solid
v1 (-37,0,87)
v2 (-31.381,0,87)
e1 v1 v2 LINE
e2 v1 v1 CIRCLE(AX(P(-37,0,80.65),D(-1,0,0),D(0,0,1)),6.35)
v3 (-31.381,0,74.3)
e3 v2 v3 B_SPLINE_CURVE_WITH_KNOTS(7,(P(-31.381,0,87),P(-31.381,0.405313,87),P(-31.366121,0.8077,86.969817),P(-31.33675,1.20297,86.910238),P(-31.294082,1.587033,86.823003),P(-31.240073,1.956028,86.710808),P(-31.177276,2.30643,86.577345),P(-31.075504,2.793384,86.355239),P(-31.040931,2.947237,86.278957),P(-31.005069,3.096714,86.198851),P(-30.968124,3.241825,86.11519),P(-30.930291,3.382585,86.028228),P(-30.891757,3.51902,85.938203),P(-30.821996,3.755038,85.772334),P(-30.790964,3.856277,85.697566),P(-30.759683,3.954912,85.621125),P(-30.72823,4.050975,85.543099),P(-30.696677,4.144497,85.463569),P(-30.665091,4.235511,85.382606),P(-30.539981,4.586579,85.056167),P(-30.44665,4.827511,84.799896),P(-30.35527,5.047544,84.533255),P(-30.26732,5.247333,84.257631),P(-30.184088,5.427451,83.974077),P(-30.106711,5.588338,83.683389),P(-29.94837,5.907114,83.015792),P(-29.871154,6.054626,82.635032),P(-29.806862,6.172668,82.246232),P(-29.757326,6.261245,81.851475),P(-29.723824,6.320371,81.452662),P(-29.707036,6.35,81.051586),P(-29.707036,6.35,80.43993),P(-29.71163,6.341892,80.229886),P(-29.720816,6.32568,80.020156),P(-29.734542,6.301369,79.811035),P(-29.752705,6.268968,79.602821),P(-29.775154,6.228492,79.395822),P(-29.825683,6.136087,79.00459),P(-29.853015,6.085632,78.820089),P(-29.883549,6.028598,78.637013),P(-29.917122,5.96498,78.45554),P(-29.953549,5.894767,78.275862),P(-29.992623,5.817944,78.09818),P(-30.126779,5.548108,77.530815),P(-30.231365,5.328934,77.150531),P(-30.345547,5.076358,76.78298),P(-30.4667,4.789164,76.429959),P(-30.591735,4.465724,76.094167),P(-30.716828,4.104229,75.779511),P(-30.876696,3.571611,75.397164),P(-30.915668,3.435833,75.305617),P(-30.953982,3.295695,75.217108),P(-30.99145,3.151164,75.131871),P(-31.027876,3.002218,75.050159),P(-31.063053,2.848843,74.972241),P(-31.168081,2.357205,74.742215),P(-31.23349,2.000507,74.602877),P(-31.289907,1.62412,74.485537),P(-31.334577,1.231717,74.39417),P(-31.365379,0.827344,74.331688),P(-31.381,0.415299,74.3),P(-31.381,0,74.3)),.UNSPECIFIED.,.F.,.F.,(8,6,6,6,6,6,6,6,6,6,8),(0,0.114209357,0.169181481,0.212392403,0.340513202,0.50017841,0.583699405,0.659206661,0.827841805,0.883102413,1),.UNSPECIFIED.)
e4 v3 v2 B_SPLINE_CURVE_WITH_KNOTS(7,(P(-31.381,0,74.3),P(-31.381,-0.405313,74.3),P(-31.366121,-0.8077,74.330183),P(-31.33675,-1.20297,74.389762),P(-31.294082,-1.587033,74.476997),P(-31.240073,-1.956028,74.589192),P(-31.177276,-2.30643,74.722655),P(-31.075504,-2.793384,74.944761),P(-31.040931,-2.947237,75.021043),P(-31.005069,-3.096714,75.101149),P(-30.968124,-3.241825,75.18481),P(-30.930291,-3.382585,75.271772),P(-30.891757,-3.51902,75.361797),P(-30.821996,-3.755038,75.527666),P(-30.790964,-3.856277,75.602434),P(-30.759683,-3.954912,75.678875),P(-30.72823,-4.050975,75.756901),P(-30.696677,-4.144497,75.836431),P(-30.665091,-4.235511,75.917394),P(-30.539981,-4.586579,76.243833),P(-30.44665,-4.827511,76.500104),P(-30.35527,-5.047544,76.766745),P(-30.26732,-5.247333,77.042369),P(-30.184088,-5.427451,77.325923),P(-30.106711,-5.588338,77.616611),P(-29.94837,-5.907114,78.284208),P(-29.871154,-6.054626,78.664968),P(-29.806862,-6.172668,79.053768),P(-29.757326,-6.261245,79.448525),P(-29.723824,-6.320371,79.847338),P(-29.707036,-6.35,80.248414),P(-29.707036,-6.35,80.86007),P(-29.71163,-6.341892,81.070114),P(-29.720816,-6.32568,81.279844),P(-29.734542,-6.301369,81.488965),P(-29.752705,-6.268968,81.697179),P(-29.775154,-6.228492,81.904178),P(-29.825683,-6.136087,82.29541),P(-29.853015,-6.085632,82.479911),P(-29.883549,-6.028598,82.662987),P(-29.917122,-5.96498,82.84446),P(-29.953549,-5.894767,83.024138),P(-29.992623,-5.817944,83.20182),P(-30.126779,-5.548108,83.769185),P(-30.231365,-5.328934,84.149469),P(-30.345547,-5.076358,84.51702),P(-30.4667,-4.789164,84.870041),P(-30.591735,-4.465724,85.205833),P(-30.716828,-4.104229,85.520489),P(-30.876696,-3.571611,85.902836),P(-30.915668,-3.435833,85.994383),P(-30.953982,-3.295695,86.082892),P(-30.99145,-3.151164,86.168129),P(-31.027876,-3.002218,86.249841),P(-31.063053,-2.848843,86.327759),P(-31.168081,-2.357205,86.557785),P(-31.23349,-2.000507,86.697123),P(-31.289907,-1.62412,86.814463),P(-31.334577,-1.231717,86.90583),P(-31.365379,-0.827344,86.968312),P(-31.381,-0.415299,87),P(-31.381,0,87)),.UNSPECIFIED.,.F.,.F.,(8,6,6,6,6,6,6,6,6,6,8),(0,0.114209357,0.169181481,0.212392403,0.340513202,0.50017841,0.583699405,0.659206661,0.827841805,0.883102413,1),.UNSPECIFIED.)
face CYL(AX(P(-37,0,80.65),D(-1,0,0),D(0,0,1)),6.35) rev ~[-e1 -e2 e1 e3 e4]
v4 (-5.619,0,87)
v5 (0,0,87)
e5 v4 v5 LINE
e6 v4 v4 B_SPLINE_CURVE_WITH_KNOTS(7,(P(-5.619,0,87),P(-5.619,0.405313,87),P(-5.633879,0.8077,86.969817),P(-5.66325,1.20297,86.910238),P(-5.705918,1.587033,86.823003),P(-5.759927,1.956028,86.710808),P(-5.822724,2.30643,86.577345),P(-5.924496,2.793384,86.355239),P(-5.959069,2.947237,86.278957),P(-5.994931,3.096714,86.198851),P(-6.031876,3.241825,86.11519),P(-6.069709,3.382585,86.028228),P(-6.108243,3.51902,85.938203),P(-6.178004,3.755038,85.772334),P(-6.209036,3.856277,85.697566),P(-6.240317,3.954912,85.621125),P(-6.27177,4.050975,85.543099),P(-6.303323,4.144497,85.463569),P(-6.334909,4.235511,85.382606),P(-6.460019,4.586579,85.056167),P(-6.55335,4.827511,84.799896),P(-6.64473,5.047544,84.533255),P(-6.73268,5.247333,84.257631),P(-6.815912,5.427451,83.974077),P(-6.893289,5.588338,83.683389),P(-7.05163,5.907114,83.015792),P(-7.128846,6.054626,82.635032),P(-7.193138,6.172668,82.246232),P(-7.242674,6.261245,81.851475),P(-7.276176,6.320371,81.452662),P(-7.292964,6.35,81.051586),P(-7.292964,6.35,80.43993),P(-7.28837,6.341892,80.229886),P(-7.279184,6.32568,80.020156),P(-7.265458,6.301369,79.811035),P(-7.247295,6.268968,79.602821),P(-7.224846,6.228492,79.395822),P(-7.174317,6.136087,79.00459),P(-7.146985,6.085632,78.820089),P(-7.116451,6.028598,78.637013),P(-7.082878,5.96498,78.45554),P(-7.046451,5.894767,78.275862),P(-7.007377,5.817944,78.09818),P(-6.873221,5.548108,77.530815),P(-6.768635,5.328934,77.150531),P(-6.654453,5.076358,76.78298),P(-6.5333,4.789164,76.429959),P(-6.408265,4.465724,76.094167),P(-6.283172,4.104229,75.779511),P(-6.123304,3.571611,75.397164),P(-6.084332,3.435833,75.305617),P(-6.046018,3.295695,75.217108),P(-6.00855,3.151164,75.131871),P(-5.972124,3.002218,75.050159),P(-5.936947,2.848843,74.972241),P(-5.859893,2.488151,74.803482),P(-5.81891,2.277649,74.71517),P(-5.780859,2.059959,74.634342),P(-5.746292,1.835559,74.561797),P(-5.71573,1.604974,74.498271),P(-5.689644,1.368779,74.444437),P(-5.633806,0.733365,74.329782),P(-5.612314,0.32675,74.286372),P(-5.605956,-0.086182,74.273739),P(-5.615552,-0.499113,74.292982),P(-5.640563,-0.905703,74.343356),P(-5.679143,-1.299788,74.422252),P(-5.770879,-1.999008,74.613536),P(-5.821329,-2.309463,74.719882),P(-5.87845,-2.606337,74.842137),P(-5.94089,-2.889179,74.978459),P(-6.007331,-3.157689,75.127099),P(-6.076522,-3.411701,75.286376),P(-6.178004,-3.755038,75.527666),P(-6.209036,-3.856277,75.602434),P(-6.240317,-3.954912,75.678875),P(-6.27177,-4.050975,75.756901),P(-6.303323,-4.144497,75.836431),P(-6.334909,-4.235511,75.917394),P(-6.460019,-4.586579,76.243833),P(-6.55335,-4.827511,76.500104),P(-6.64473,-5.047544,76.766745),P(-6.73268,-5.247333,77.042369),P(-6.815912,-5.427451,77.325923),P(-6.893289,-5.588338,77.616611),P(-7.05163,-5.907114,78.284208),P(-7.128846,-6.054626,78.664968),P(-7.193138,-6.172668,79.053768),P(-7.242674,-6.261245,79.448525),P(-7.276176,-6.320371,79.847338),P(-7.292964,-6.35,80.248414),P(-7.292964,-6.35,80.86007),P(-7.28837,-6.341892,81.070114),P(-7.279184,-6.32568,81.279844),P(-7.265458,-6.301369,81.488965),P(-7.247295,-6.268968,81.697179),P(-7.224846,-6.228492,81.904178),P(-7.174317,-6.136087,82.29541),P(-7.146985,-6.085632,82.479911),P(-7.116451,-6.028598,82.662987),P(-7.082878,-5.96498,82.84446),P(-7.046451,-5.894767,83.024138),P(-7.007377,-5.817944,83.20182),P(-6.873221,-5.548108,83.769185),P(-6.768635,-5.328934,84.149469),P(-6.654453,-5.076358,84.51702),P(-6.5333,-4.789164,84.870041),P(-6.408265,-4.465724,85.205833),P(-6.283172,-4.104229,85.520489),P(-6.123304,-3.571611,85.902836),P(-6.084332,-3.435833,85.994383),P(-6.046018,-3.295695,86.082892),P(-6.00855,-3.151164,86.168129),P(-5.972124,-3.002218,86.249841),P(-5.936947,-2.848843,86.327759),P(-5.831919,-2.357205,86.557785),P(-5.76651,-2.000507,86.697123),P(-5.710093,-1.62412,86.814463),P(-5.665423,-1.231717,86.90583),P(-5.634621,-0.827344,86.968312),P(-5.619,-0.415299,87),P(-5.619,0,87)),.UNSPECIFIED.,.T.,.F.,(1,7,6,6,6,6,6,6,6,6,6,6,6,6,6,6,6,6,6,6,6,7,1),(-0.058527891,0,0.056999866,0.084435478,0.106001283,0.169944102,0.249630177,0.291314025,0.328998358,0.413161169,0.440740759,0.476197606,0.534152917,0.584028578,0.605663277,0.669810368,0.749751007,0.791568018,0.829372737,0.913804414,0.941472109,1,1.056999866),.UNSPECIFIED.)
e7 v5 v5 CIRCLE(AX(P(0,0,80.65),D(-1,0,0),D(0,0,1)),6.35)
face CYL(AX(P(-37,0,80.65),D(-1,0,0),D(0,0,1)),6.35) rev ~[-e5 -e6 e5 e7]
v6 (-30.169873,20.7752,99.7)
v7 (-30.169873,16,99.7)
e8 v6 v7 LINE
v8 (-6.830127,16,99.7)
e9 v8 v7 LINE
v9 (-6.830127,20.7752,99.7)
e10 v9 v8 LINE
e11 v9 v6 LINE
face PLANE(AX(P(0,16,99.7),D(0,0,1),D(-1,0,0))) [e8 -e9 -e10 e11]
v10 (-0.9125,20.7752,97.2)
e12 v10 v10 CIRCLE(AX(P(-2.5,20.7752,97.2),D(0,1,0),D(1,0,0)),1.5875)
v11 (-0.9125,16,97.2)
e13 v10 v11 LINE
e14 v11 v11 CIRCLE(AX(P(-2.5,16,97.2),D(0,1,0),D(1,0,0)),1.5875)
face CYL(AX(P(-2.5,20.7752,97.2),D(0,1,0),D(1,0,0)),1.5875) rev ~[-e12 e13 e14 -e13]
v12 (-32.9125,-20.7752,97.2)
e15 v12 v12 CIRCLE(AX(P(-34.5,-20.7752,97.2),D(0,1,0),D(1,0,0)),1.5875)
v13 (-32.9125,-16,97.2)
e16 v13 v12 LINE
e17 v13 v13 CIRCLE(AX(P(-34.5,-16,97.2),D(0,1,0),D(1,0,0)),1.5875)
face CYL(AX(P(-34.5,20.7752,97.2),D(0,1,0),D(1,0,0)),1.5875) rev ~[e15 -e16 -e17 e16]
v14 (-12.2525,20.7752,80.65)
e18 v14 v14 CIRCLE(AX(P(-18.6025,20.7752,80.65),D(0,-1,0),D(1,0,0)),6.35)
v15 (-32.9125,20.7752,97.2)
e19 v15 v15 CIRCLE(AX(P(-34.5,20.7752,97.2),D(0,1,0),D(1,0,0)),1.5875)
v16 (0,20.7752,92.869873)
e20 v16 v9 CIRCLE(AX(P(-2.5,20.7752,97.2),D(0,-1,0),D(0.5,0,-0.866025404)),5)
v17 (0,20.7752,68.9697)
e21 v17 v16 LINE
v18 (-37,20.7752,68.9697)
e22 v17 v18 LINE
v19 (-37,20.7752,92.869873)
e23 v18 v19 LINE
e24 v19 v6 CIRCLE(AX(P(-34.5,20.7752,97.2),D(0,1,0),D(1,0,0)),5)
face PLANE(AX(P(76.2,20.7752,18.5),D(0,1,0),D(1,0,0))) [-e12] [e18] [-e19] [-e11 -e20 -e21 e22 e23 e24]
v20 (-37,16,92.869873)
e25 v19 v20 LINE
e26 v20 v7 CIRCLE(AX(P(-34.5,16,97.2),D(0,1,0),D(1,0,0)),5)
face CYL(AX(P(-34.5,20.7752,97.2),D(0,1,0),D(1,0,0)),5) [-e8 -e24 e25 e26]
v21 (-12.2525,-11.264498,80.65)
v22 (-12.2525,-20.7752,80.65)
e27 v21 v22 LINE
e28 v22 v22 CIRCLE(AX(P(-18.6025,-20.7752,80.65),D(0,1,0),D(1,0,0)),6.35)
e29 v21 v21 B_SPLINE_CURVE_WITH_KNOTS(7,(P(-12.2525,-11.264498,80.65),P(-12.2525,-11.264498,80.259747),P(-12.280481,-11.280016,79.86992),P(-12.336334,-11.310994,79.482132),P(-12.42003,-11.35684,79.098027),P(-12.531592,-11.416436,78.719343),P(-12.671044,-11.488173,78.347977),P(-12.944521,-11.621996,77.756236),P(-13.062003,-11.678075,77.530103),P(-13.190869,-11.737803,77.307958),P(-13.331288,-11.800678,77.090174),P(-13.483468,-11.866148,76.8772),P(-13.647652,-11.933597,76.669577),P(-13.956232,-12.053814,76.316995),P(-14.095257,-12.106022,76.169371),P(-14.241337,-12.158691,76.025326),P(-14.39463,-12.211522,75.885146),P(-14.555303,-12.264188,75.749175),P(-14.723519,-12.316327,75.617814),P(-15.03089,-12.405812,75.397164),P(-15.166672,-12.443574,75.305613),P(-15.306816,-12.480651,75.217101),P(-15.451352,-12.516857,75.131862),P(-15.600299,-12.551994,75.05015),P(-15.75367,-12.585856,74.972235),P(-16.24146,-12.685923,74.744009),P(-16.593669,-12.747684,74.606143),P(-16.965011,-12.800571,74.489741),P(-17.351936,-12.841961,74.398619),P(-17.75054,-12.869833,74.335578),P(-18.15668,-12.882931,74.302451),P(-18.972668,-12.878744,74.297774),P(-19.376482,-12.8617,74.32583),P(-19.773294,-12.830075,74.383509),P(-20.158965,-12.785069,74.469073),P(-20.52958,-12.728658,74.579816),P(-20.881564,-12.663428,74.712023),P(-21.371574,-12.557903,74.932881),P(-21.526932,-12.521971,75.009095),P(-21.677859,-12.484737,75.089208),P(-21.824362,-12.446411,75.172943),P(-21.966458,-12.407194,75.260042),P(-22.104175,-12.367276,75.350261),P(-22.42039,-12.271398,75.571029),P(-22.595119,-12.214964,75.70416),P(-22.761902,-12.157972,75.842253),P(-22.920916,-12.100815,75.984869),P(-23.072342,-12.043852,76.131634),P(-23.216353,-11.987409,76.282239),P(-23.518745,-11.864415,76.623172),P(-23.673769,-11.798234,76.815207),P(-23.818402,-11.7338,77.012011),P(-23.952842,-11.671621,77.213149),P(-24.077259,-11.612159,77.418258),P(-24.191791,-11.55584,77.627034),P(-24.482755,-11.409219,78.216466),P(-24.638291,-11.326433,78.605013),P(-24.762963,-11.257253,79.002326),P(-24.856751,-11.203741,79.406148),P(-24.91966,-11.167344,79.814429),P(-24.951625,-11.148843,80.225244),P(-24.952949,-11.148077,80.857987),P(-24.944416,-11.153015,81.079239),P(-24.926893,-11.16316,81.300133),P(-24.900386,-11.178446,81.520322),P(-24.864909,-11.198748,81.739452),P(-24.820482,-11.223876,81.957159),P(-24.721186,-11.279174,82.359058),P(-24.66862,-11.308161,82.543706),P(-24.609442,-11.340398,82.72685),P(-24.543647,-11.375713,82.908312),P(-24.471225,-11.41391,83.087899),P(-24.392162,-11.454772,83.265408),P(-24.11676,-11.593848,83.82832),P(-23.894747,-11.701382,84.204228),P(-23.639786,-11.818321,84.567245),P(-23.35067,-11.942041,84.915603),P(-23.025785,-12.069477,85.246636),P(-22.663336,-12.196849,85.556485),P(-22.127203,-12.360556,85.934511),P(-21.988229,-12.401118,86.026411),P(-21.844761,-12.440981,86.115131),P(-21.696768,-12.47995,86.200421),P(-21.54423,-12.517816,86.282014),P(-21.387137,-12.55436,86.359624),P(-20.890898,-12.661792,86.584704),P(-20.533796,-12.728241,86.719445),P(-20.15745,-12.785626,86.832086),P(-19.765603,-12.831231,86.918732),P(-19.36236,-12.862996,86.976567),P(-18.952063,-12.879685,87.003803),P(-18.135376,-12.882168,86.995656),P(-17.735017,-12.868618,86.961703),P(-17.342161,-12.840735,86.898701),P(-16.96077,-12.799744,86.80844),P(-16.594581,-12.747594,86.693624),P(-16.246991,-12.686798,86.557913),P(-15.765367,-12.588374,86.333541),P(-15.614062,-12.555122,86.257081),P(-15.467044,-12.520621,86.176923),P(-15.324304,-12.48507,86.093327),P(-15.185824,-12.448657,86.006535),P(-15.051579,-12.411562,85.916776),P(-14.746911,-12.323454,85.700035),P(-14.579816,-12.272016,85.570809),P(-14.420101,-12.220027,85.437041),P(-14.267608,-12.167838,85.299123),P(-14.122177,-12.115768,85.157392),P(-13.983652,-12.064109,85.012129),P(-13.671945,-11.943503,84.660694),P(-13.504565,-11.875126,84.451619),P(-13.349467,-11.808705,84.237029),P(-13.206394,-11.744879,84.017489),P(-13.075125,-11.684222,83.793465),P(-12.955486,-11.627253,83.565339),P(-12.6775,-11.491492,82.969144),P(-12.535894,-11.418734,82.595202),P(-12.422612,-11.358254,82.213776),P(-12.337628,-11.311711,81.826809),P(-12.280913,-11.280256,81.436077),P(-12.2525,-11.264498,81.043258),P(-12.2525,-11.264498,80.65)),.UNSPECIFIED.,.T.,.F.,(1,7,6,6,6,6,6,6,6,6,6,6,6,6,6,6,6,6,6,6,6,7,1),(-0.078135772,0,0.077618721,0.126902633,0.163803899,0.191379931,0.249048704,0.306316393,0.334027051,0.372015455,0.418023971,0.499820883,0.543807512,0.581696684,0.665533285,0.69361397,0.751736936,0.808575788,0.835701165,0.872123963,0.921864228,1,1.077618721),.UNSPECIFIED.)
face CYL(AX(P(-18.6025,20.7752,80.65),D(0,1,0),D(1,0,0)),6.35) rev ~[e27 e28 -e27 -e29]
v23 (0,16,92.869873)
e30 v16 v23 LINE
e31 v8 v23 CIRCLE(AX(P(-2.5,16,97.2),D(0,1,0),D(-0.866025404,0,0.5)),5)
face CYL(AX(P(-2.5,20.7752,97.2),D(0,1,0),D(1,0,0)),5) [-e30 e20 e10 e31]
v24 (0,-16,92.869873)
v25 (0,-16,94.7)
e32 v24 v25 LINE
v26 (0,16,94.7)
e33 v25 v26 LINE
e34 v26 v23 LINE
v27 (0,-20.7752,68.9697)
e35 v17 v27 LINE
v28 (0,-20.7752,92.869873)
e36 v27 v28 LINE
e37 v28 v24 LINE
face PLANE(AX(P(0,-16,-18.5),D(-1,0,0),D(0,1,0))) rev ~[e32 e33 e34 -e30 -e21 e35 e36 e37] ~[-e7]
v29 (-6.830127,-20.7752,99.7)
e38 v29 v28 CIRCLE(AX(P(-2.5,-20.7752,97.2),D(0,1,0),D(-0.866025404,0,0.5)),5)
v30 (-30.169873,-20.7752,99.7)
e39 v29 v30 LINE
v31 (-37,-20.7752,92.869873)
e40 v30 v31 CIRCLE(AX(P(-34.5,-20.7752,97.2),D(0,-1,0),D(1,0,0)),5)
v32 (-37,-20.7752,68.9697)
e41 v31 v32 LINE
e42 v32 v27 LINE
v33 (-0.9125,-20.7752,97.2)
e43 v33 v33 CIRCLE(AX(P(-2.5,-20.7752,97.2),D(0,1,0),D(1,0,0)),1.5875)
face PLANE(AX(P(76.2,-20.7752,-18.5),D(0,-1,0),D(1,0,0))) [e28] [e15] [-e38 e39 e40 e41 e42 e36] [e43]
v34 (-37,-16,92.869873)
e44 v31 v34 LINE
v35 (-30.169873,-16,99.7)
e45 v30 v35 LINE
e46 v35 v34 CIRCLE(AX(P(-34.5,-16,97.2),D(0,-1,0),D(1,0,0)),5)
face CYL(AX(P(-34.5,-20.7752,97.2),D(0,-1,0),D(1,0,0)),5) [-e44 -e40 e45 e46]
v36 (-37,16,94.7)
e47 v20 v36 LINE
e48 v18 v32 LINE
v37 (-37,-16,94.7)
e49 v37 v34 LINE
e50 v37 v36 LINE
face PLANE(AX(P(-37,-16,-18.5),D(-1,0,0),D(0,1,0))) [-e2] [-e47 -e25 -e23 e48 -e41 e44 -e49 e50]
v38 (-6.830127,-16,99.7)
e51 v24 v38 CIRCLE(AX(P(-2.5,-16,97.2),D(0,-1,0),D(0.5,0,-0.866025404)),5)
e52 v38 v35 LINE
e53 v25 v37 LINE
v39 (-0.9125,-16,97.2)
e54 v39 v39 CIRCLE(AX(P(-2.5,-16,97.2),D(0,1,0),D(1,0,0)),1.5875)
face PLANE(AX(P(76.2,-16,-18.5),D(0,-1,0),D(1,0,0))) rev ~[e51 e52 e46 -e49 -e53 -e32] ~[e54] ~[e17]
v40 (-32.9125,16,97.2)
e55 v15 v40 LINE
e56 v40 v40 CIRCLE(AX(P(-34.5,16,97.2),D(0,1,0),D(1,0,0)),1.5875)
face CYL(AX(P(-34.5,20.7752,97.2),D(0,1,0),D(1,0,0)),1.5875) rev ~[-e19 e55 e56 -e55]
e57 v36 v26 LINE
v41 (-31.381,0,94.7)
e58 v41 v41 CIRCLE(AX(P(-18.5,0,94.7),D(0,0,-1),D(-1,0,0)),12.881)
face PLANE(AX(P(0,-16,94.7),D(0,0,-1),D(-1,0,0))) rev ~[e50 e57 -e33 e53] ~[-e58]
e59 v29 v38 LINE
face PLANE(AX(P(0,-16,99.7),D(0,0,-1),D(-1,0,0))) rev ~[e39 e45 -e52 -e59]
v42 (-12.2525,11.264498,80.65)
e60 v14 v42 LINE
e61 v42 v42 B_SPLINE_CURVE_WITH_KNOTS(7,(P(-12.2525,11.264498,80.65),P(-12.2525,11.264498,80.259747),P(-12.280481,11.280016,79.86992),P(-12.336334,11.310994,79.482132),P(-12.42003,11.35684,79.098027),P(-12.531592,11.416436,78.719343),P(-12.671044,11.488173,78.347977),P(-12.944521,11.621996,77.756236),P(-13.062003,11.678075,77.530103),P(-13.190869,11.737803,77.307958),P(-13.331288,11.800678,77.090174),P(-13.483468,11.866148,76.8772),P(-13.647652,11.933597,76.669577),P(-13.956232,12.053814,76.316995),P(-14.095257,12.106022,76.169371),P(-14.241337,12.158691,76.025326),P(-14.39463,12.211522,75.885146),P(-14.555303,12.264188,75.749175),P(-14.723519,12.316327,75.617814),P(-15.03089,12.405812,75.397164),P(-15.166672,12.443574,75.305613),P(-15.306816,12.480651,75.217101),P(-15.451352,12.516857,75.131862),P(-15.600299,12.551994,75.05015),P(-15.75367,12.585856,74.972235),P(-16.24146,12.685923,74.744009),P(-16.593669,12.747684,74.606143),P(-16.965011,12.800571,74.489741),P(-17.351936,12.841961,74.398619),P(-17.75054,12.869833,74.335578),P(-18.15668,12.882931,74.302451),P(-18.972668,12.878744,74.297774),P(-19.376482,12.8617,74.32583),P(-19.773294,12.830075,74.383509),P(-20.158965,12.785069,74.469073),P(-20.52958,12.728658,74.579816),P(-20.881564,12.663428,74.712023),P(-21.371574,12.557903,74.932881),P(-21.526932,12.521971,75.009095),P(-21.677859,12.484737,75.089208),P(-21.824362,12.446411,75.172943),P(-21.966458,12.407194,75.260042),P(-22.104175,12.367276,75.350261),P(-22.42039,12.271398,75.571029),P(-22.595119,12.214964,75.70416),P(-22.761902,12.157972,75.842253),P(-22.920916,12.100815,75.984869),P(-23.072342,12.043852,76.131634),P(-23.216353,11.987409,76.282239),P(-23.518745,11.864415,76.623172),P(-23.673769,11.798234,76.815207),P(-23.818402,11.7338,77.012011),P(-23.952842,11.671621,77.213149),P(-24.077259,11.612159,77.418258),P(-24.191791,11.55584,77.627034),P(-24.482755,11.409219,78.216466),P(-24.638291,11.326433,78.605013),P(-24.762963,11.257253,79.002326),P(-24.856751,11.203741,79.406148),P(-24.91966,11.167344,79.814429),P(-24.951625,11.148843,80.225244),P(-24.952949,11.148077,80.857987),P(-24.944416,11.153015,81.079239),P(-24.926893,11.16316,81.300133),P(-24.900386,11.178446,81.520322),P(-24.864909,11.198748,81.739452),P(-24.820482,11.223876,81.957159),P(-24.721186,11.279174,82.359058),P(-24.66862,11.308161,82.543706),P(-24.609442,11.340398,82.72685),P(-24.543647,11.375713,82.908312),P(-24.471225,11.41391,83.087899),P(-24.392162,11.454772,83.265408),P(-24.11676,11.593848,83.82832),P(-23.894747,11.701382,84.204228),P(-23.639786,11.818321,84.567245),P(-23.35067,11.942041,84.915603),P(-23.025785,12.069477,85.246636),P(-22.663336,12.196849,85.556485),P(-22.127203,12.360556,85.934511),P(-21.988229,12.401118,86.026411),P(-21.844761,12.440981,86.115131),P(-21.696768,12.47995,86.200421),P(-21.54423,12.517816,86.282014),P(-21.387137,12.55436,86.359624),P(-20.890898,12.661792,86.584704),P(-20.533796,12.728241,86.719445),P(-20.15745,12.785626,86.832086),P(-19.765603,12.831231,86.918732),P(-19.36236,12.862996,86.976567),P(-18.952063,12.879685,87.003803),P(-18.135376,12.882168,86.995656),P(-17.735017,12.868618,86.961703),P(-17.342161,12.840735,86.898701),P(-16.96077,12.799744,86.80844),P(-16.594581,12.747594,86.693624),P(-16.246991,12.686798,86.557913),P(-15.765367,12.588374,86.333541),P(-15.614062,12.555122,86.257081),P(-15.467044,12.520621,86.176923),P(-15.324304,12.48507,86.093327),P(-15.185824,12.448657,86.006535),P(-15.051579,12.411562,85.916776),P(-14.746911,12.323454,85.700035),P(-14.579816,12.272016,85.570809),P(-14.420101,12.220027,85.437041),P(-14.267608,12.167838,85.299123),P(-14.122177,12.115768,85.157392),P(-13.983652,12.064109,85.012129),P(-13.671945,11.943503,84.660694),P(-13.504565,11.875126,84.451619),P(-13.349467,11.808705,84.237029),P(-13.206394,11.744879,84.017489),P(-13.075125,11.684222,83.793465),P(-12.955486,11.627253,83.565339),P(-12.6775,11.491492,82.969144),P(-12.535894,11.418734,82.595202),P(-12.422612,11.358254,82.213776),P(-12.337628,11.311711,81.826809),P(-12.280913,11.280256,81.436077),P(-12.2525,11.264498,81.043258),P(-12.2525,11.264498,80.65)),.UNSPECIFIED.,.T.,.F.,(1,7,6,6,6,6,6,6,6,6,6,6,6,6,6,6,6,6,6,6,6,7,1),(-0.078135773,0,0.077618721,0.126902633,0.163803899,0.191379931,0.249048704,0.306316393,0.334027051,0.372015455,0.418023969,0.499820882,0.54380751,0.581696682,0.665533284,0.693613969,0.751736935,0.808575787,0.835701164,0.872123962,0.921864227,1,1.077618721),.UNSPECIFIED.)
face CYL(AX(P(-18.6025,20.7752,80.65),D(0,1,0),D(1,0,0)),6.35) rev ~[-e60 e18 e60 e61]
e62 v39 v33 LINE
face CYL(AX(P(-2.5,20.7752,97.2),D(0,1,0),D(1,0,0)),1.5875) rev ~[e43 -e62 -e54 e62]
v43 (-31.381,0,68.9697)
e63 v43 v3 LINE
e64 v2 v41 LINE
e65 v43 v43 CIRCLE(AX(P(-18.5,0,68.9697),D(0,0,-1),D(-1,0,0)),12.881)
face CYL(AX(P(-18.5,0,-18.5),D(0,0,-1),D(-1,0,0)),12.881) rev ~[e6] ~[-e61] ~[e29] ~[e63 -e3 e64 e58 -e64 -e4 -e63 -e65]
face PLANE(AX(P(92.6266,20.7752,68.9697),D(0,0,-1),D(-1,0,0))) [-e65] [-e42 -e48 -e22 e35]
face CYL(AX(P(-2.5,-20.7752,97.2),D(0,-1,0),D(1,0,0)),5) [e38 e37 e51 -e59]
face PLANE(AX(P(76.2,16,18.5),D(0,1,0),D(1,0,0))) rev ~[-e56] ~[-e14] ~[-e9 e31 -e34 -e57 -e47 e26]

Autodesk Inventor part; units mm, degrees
ref_plane "YZ Plane" through (0, 0, 0) normal (1, 0, 0) x (0, 1, 0)
ref_plane "XZ Plane" through (0, 0, 0) normal (0, 1, 0) x (-1, 0, 0)
ref_plane "XY Plane" through (0, 0, 0) normal (0, 0, 1) x (1, 0, 0)
sketch "Sketch2" plane through (0, 0, 0) normal (1, 0, 0) x (0, 1, 0)
  circle A0 centre (0, 0) radius 12.881
  line L0 (-16, -18.5) -> (16, -18.5)
  line L1 (16, -18.5) -> (16, 18.5)
  line L2 (16, 18.5) -> (-16, 18.5)
  line L3 (-16, 18.5) -> (-16, -18.5)
  line L4 (-16, -18.5) -> (16, 18.5) construction
  line L5 (16, -18.5) -> (-16, 18.5) construction
  dimension "d9" = 25.762
  dimension "d10" = 32
  dimension "d11" = 37
extrude "Extrusion2" add sketch "Sketch2" along normal blind 76.2
sketch "Sketch3" plane through (0, -16, -18.5) normal (0, 0, -1) x (-1, 0, 0)
  line L0 (0, 0) -> (0, 32) projected
  circle A0 centre (18.5, 16) radius 12.881
  line L1 (0, 32) -> (0, 0)
  line L2 (0, 0) -> (37, 0)
  line L3 (37, 0) -> (37, 32)
  line L4 (37, 32) -> (0, 32)
  line L5 (0, 32) -> (37, 0) construction
  line L6 (0, 0) -> (37, 32) construction
  point P0 (0, 16)
  dimension "d14" = 25.762
  dimension "d15" = 32
  dimension "d16" = 37
extrude "Extrusion3" add sketch "Sketch3" against normal blind 113.2
sketch "Sketch4" plane through (76.2, -16, -18.5) normal (0, 0, -1) x (-1, 0, 0)
  circle A0 centre (94.7, 16) radius 12.881 projected
  point P0 (76.2, 16)
extrude "Extrusion4" add sketch "Sketch4" against normal blind 37
sketch "Sketch5" plane through (76.2, 16, 18.5) normal (0, 1, 0) x (1, 0, 0)
  line L0 (-113.2, 37) -> (0, 37) projected
  line L1 (-113.2, 37) -> (-113.2, -76.2) projected
  line L2 (-113.2, 37) -> (-100.1185, 50.0815)
  line L3 (-113.2, 37) -> (-94.7, 37) construction
  line L4 (-113.2, 37) -> (-126.2815, 23.9185)
  line L5 (-113.2, 37) -> (-94.7, 37) construction
  line L6 (-100.1185, 50.0815) -> (-154.0001, 103.963)
  line L7 (-126.2815, 23.9185) -> (-180.163, 77.8001)
  line L8 (-126.2815, 23.9185) -> (-50.0815, 23.9185) construction
  line L9 (-154.0001, 103.963) -> (-180.163, 77.8001)
  line L10 (-100.1185, 50.0815) -> (-87.037, 37)
  line L11 (-126.2815, 23.9185) -> (-113.2, 10.837)
  point P0 (-76.2, 18.5)
  dimension "d21" = 18.5
  dimension "d22" = 45
  dimension "d23" = 18.5
  dimension "d24" = 135
  dimension "d25" = 76.2
  dimension "d26" = 76.2
  dimension "d27" = 135
extrude "Extrusion5" add sketch "Sketch5" against normal blind 32
sketch "Sketch7" plane through (-77.8001, -16, -85.463) normal (-0.7071068, 0, -0.7071068) x (-0.7071068, 0, 0.7071068)
  line L0 (36.4256, 0.4968) -> (36.4256, 31.5032)
  line L1 (36.4256, 31.5032) -> (0.5744, 31.5032)
  line L2 (0.5744, 31.5032) -> (0.5744, 0.4968)
  line L3 (0.5744, 0.4968) -> (36.4256, 0.4968)
  circle A0 centre (18.5, 16) radius 12.881
  point P0 (5.4185, 16)
  point P1 (36.4256, 16)
  dimension "d131" = 25.762
extrude "Extrusion6" cut sketch "Sketch7" against normal blind 101.6 contours A0
sketch "Sketch8" plane through (76.2, 16, 18.5) normal (0, 1, 0) x (1, 0, 0)
  line L0 (-76.2, 0) -> (0, 0) projected
  line L1 (-87.037, 37) -> (0, 37) projected
  line L2 (-87.037, 37) -> (-154.0001, 103.963) projected
  line L3 (-180.163, 77.8001) -> (-113.2, 10.837) projected
  line L4 (-113.2, 10.837) -> (-113.2, -76.2) projected
  line L5 (-76.2, 0) -> (-76.2, -76.2) projected
  line L6 (0, 37) -> (5, 37)
  line L7 (5, 37) -> (5, 0)
  line L8 (5, 0) -> (0, 0)
  line L9 (0, 0) -> (0, 37)
  line L10 (-113.2, -76.2) -> (-76.2, -76.2)
  line L11 (-76.2, -76.2) -> (-76.2, -81.2)
  line L12 (-76.2, -81.2) -> (-113.2, -81.2)
  line L13 (-113.2, -81.2) -> (-113.2, -76.2)
  line L14 (-180.163, 77.8001) -> (-183.6985, 81.3356)
  line L15 (-183.6985, 81.3356) -> (-157.5356, 107.4985)
  line L16 (-157.5356, 107.4985) -> (-154.0001, 103.963)
  point P0 (-76.2, 18.5)
  dimension "d32" = 5
  dimension "d33" = 5
  dimension "d34" = 5
  dimension "d35" = 90
extrude "Extrusion7" add sketch "Sketch8" along normal blind 4.7752
sketch "Sketch9" plane through (76.2, -16, -18.5) normal (0, -1, 0) x (1, 0, 0)
  line L0 (-87.037, 0) -> (0, 0) projected
  line L1 (-76.2, 37) -> (0, 37) projected
  line L2 (-76.2, 37) -> (-76.2, 113.2) projected
  line L3 (-113.2, 26.163) -> (-113.2, 113.2) projected
  line L4 (-113.2, 26.163) -> (-180.163, -40.8001) projected
  line L5 (-154.0001, -66.963) -> (-87.037, 0) projected
  line L6 (-76.2, 118.2) -> (-76.2, 37) projected
  line L7 (-113.2, 113.2) -> (-76.2, 113.2)
  line L8 (-76.2, 113.2) -> (-76.2, 118.2)
  line L9 (-76.2, 118.2) -> (-113.2, 118.2)
  line L10 (-113.2, 118.2) -> (-113.2, 113.2)
  line L11 (-76.2, 37) -> (5, 37) projected
  line L12 (0, 0) -> (5, 0)
  line L13 (5, 0) -> (5, 37)
  line L14 (5, 37) -> (0, 37)
  line L15 (0, 37) -> (0, 0)
  line L16 (-183.6985, -44.3356) -> (-113.2, 26.163) projected
  line L17 (-180.163, -40.8001) -> (-183.6985, -44.3356)
  line L18 (-183.6985, -44.3356) -> (-157.5356, -70.4985)
  line L19 (-157.5356, -70.4985) -> (-154.0001, -66.963)
  point P0 (-76.2, 18.5)
extrude "Extrusion8" add sketch "Sketch9" along normal blind 4.7752
sketch "Sketch10" plane through (76.2, 20.7752, 18.5) normal (0, 1, 0) x (1, 0, 0)
  circle A0 centre (2.5, 34.5) radius 1.5875
  circle A1 centre (2.5, 2.5) radius 1.5875
  line L0 (0, 37) -> (0, 0)
  line L1 (0, 0) -> (5, 0)
  line L2 (5, 37) -> (5, 0)
  line L3 (0, 37) -> (5, 37)
  point P0 (-76.2, 18.5)
  point P1 (0, 18.5)
extrude "Extrusion9" cut sketch "Sketch10" against normal blind 279.4 contours A0 | A1
sketch "Sketch11" plane through (76.2, 20.7752, 18.5) normal (0, 1, 0) x (1, 0, 0)
  circle A0 centre (-78.7, -78.7) radius 1.5875
  circle A1 centre (-110.7, -78.7) radius 1.5875
  line L0 (-76.2, -76.2) -> (-113.2, -76.2)
  line L1 (-113.2, -76.2) -> (-113.2, -81.2)
  line L2 (-76.2, -81.2) -> (-113.2, -81.2)
  line L3 (-76.2, -76.2) -> (-76.2, -81.2)
  circle A2 centre (-157.5356, 103.963) radius 1.5875
  circle A3 centre (-180.163, 81.3356) radius 1.5875
  line L4 (-157.5356, 107.4985) -> (-183.6985, 81.3356)
  line L5 (-183.6985, 81.3356) -> (-180.163, 77.8001)
  line L6 (-154.0001, 103.963) -> (-180.163, 77.8001)
  line L7 (-157.5356, 107.4985) -> (-154.0001, 103.963)
  point P0 (-76.2, 18.5)
  point P1 (-94.7, -76.2)
  point P2 (-170.6171, 94.4171)
extrude "Extrusion10" cut sketch "Sketch11" against normal blind 279.4 contours A0 | A1 | A2 | A3
fillet "Fillet1" radius 3.175 3 edges at (-10.837, 0, -18.5) (0, 0, 18.5) (-37, 0, 7.663)
sketch "Sketch13" plane through (76.2, 20.7752, 18.5) normal (0, 1, 0) x (1, 0, 0)
  line L0 (-157.5356, 107.4985) -> (-183.6985, 81.3356) projected
  line L1 (-113.2, -81.2) -> (-76.2, -81.2) projected
  line L2 (5, 0) -> (5, 37) projected
  line L3 (5, 37) -> (5, 0) projected
  line L4 (5, 18.5) -> (-120.863, 18.5)
  line L5 (-114.1299, 11.767) -> (-183.6985, 81.3356) projected
  line L6 (-76.2, -81.2) -> (-113.2, -81.2) projected
  line L7 (-94.7, -81.2) -> (-95.2395, 19.0395)
  line L8 (-104.3477, 9.9312) -> (-86.1312, 28.1477) projected
  line L9 (-95.2395, 19.0395) -> (-170.6171, 94.4171)
  line L10 (-183.6985, 81.3356) -> (-157.5356, 107.4985) projected
  circle A0 centre (-14.05, 18.5) radius 6.35
  circle A1 centre (-39.45, 18.5) radius 6.35
  circle A2 centre (-64.85, 18.5) radius 6.35
  circle A3 centre (-90.25, 18.5) radius 6.35
  circle A4 centre (-94.8025, -62.15) radius 6.35
  circle A5 centre (-94.9392, -36.7504) radius 6.35
  circle A6 centre (-95.0759, -11.3507) radius 6.35
  circle A7 centre (-95.2126, 14.0489) radius 6.35
  circle A8 centre (-157.1467, 80.9467) radius 6.35
  circle A9 centre (-139.1862, 62.9862) radius 6.35
  circle A10 centre (-121.2257, 45.0257) radius 6.35
  circle A11 centre (-103.2651, 27.0651) radius 6.35
  point P0 (-76.2, 18.5)
  point P1 (-95.1101, -5.0008)
  point P2 (-95.0418, -17.7006)
  point P3 (-94.9734, -30.4005)
  point P4 (-94.9051, -43.1003)
  dimension "d60" = 12.7
  dimension "d61" = 19.05
  dimension "d64" = 25.4
  dimension "d69" = 12.7
  dimension "d70" = 19.05
  dimension "d73" = 25.4
  dimension "d78" = 12.7
  dimension "d79" = 19.05
  dimension "d82" = 25.4
extrude "Extrusion12" cut sketch "Sketch13" against normal blind 127 contours A8 L9 | L9 A8 | A9 L9 | L9 A9 | A11 L9 | L9 A11 | A10 L9 | L9 A10 | A0 L4 | L4 A0 | A1 L4 | L4 A1 | A2 L4 | L4 A2 | A4 L7 | L7 A4 | A5 L7 | L7 A5 | A6 L7 | L7 A6
sketch "Sketch14" plane through (81.2, 16, -18.5) normal (0, 0, -1) x (-1, 0, 0)
  line L0 (0, 4.7752) -> (90.7219, 4.7752) projected
  line L1 (0, 0) -> (0, 4.7752) projected
  circle A0 centre (19.05, -16) radius 6.35
  circle A1 centre (44.45, -16) radius 6.35
  circle A2 centre (69.85, -16) radius 6.35
  point P0 (81.2, -16)
  dimension "d89" = 12.7
  dimension "d91" = 19.05
  dimension "d94" = 25.4
extrude "Extrusion13" cut sketch "Sketch14" against normal blind 50.8
sketch "Sketch15" plane through (-37, 16, 94.7) normal (-1, 0, 0) x (0, 0, 1)
  line L0 (5, 0) -> (5, 4.7752) projected
  line L1 (-85.7219, 4.7752) -> (5, 4.7752) projected
  circle A0 centre (-14.05, -16) radius 6.35
  circle A1 centre (-39.45, -16) radius 6.35
  circle A2 centre (-64.85, -16) radius 6.35
  point P0 (-94.7, -16)
  dimension "d101" = 12.7
  dimension "d102" = 19.05
  dimension "d105" = 25.4
extrude "Extrusion14" cut sketch "Sketch15" against normal blind 50.8
sketch "Sketch16" plane through (-107.4985, 16, -62.8356) normal (-0.7071068, 0, 0.7071068) x (0.7071068, 0, 0.7071068)
  line L0 (0, 4.7752) -> (98.3849, 4.7752) projected
  line L1 (0, 0) -> (0, 4.7752) projected
  circle A0 centre (19.05, -16) radius 6.35
  circle A1 centre (44.45, -16) radius 6.35
  circle A2 centre (69.85, -16) radius 6.35
  point P0 (120.4444, -16)
  dimension "d112" = 12.7
  dimension "d113" = 19.05
  dimension "d116" = 25.4
extrude "Extrusion15" cut sketch "Sketch16" against normal blind 101.6
sketch "Sketch19" plane through (76.2, 20.7752, 18.5) normal (0, 1, 0) x (1, 0, 0)
  circle A0 centre (-157.5356, 103.963) radius 1.5875 projected
  circle A1 centre (-78.7, -78.7) radius 1.5875 projected
  circle A2 centre (-180.163, 81.3356) radius 1.5875 projected
  circle A3 centre (-110.7, -78.7) radius 1.5875 projected
  circle A4 centre (2.5, 2.5) radius 1.5875 projected
  circle A5 centre (2.5, 34.5) radius 1.5875 projected
  line L0 (-87.967, 37.9299) -> (-157.5356, 107.4985) projected
  line L1 (-157.5356, 107.4985) -> (-183.6985, 81.3356) projected
  line L2 (-183.6985, 81.3356) -> (-114.1299, 11.767) projected
  line L3 (-113.2, 9.5219) -> (-113.2, -81.2) projected
  line L4 (-113.2, -81.2) -> (-76.2, -81.2) projected
  line L5 (-76.2, -81.2) -> (-76.2, -3.175) projected
  line L6 (-73.025, 0) -> (5, 0) projected
  line L7 (5, 0) -> (5, 37) projected
  line L8 (5, 37) -> (-85.7219, 37) projected
  circle A6 centre (2.5, 2.5) radius 5
  circle A7 centre (2.5, 34.5) radius 5
  circle A8 centre (-110.7, -78.7) radius 5
  circle A9 centre (-78.7, -78.7) radius 5
  circle A10 centre (-180.163, 81.3356) radius 5
  circle A11 centre (-157.5356, 103.963) radius 5
  point P0 (-76.2, 18.5)
  point P1 (-76.2, -74.3699)
  point P2 (-83.0301, -81.2)
  point P3 (-113.2, -74.3699)
  point P4 (-106.3699, -81.2)
  point P5 (-178.8689, 86.1652)
  point P6 (-178.8689, 76.506)
  point P7 (-152.706, 102.6689)
  point P8 (-162.3652, 102.6689)
  point P9 (5, 6.8301)
  point P10 (-1.8301, 0)
  point P11 (-1.8301, 37)
  point P12 (5, 30.1699)
  dimension "d132" = 10
  dimension "d133" = 10
  dimension "d134" = 10
  dimension "d135" = 10
  dimension "d136" = 10
  dimension "d137" = 10
extrude "Extrusion17" add sketch "Sketch19" against normal blind 4.7752 contours L0 L1 A11 | L1 L2 A10 | L3 L4 A8 | L4 L5 A9 | L6 L7 A6 | L7 L8 A7 picked at (-160.8118, 104.679) picked at (-180.881, 84.6119) picked at (-108.8911, -81.5244) picked at (-80.5163, -81.5168) picked at (0.6837, -0.3168) picked at (0.6837, 37.3168)
sketch "Sketch20" plane through (76.2, -20.7752, -18.5) normal (0, -1, 0) x (1, 0, 0)
  circle A0 centre (-157.5356, -66.963) radius 1.5875 projected
  circle A1 centre (-180.163, -44.3356) radius 1.5875 projected
  circle A2 centre (2.5, 34.5) radius 1.5875 projected
  circle A3 centre (2.5, 2.5) radius 1.5875 projected
  line L0 (-157.5356, -70.4985) -> (-87.967, -0.9299) projected
  line L1 (-85.7219, 0) -> (5, 0) projected
  line L2 (5, 0) -> (5, 37) projected
  line L3 (5, 37) -> (-73.025, 37) projected
  line L4 (-76.2, 40.175) -> (-76.2, 118.2) projected
  line L5 (-76.2, 118.2) -> (-113.2, 118.2) projected
  line L6 (-113.2, 118.2) -> (-113.2, 27.4781) projected
  line L7 (-114.1299, 25.233) -> (-183.6985, -44.3356) projected
  line L8 (-183.6985, -44.3356) -> (-157.5356, -70.4985) projected
  circle A4 centre (-157.5356, -66.963) radius 5
  circle A5 centre (-180.163, -44.3356) radius 5
  circle A6 centre (-110.7, 115.7) radius 1.5875 projected
  circle A7 centre (-110.7, 115.7) radius 5
  circle A8 centre (-78.7, 115.7) radius 1.5875 projected
  circle A9 centre (-78.7, 115.7) radius 5
  circle A10 centre (2.5, 34.5) radius 5
  circle A11 centre (2.5, 2.5) radius 5
  point P0 (-76.2, 18.5)
  point P1 (5, 6.8301)
  point P2 (-1.8301, 0)
  point P3 (-1.8301, 37)
  point P4 (5, 30.1699)
  point P5 (-83.0301, 118.2)
  point P6 (-76.2, 111.3699)
  point P7 (-106.3699, 118.2)
  point P8 (-113.2, 111.3699)
  point P9 (-162.3652, -65.6689)
  point P10 (-152.706, -65.6689)
  point P11 (-178.8689, -39.506)
  point P12 (-178.8689, -49.1652)
extrude "Extrusion18" add sketch "Sketch20" against normal blind 4.7752 contours L0 A4 L8 | L1 L2 A11 | L2 L3 A10 | L4 L5 A9 | L5 L6 A7 | L7 L8 A5 picked at (-160.8118, -67.679) picked at (0.6837, -0.3168) picked at (0.6837, 37.3168) picked at (-80.5163, 118.5168) picked at (-113.5244, 113.8911) picked at (-180.881, -47.6119)
sketch "Sketch21" plane through (76.2, 20.7752, 18.5) normal (0, 1, 0) x (1, 0, 0)
  circle A0 centre (-103.2651, 27.0651) radius 6.35 projected
  circle A1 centre (-14.05, 18.5) radius 6.35 projected
  circle A2 centre (-157.1467, 80.9467) radius 6.35 projected
  circle A3 centre (-95.0759, -11.3507) radius 6.35 projected
  circle A4 centre (-121.2257, 45.0257) radius 6.35 projected
  circle A5 centre (-39.45, 18.5) radius 6.35 projected
  circle A6 centre (-64.85, 18.5) radius 6.35 projected
  circle A7 centre (-139.1862, 62.9862) radius 6.35 projected
  circle A8 centre (-94.9392, -36.7504) radius 6.35 projected
  circle A9 centre (-157.5356, 103.963) radius 1.5875 projected
  circle A10 centre (-180.163, 81.3356) radius 1.5875 projected
  circle A11 centre (2.5, 2.5) radius 1.5875 projected
  circle A12 centre (2.5, 34.5) radius 1.5875 projected
  line L0 (-201.6081, 114.1304) -> (16.4266, 114.1304)
  line L1 (16.4266, 114.1304) -> (16.4266, -50.4697)
  line L2 (16.4266, -50.4697) -> (-201.6081, -50.4697)
  line L3 (-201.6081, -50.4697) -> (-201.6081, 114.1304)
  point P0 (-76.2, 18.5)
extrude "Extrusion19" cut sketch "Sketch21" against normal blind 76.2
properties part number "testPrintBracketV2"
